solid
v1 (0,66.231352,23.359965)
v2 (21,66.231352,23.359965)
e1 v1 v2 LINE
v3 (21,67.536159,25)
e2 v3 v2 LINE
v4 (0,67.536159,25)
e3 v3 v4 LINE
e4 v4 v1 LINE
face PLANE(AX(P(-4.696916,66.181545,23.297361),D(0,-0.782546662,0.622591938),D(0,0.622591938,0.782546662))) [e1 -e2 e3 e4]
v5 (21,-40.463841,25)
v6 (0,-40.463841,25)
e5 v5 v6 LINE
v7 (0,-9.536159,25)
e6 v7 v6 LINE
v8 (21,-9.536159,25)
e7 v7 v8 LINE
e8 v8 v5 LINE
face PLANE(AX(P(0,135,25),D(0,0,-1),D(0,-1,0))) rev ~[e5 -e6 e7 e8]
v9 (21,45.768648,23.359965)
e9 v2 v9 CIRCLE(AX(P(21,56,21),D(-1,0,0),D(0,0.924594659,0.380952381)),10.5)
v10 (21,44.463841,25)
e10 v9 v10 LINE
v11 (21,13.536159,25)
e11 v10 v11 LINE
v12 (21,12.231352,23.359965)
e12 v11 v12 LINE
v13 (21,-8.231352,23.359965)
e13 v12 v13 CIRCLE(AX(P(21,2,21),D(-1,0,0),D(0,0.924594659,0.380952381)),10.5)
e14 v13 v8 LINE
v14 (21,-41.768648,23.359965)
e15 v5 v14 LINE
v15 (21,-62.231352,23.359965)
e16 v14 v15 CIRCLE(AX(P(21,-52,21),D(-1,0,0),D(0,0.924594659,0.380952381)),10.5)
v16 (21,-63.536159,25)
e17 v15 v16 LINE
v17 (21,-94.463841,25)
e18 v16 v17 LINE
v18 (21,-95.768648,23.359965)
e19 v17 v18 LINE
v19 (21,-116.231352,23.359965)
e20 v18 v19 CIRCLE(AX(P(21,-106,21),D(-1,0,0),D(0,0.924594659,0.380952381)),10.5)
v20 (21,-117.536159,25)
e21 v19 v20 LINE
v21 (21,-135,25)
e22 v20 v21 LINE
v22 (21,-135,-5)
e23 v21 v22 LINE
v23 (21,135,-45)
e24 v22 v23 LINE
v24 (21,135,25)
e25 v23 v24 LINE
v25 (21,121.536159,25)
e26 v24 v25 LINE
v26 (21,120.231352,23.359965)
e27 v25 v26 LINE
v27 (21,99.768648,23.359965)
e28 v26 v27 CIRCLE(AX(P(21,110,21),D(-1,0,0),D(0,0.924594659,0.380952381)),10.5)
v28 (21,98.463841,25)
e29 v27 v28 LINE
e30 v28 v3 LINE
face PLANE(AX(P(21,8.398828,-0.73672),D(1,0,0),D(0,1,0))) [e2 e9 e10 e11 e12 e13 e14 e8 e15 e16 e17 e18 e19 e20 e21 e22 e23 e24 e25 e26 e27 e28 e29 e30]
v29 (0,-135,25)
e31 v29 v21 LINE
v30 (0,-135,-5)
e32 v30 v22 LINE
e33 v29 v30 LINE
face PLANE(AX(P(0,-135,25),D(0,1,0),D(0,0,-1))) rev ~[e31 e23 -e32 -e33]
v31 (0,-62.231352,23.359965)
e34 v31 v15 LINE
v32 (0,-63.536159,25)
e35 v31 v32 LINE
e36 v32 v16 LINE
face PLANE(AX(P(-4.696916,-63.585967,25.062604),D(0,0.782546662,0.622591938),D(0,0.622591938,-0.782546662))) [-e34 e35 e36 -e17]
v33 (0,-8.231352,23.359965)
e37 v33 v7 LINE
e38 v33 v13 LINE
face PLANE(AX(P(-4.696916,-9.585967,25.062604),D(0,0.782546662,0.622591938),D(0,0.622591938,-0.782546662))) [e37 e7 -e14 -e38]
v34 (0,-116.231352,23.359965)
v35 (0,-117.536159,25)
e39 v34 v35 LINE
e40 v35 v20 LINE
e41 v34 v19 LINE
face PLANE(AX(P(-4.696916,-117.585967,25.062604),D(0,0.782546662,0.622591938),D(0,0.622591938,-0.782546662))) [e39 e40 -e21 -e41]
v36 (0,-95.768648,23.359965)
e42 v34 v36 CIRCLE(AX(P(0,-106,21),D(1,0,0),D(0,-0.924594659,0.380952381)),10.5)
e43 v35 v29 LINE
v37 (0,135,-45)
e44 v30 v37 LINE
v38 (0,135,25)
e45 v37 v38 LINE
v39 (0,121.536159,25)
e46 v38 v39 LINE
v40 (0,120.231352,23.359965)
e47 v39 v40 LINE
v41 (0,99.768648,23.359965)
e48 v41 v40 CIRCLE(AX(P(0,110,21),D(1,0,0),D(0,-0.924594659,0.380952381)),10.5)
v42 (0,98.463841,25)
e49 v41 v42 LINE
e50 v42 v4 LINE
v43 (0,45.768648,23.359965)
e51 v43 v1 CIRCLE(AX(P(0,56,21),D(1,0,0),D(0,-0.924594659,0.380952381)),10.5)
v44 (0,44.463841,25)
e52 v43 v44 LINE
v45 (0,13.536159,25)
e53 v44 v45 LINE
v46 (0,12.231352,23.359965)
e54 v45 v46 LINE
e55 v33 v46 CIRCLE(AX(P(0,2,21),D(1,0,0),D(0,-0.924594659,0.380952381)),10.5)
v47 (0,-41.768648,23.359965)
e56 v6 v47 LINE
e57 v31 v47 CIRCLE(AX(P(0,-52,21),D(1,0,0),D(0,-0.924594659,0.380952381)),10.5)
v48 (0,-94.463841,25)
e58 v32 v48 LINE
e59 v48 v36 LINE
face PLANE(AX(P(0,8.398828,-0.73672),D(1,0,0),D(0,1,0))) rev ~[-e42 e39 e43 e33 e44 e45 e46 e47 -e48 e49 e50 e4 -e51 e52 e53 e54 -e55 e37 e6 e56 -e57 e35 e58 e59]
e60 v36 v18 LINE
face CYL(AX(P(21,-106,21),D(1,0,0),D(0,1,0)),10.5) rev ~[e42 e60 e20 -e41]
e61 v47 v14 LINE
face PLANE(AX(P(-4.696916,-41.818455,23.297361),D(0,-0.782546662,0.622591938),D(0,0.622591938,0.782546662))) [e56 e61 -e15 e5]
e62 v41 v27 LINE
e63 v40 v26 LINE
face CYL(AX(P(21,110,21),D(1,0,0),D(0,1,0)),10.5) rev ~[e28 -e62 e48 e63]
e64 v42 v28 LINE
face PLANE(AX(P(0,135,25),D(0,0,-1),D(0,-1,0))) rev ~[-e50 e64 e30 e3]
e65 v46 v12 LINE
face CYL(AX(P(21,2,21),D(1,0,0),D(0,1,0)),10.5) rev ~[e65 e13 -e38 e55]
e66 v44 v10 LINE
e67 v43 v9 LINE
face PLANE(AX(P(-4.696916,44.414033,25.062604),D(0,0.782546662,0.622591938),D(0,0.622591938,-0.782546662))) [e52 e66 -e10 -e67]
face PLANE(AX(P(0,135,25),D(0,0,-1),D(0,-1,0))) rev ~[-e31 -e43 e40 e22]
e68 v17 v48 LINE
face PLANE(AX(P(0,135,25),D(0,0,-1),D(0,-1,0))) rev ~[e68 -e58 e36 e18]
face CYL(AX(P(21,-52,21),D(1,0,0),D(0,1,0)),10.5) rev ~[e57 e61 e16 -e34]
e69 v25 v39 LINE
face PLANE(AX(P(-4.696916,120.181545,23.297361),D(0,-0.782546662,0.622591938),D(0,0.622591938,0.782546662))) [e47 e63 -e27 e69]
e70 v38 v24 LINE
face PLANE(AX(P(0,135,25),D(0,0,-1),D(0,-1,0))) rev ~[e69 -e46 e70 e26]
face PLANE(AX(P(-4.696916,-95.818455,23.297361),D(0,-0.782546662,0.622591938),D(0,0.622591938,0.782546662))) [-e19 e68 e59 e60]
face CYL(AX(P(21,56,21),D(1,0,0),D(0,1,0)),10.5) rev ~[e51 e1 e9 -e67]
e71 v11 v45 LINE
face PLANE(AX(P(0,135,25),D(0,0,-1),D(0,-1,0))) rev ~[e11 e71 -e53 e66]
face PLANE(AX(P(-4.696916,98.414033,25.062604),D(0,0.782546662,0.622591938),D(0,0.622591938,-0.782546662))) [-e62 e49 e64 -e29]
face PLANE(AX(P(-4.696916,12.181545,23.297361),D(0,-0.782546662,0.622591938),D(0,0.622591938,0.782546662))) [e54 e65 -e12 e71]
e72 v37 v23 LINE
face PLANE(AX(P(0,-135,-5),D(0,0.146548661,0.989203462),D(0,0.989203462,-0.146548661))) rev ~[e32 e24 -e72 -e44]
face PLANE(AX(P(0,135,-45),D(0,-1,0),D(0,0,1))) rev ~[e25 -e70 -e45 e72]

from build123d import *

# Parameters (mm, degrees)
F1_DEPTH    = 21
F2_R        = 10.5
F3_DEPTH    = 25
F4_T1_DEPTH = 30.3938312155


# Not quite as in the source:
# - a fillet or chamfer that OpenCascade refuses, or shapes differently, is made with other operations: its cross-section is extruded or revolved along the edge and cut away or added


with BuildPart() as f1:
    # F0 (on Right) → F1 (new body)
    with BuildSketch(Plane.YZ):
        Polygon((-135, -5), (135, -45), (135, 25), (-135, 25), align=None)
    extrude(amount=F1_DEPTH)

    # F2 (on face) → F3 (cut)
    with BuildSketch(Plane.YZ.offset(21)):
        with Locations((110, 21)):
            Circle(F2_R)
        with Locations((56, 21)):
            Circle(F2_R)
        with Locations((2, 21)):
            Circle(F2_R)
        with Locations((-52, 21)):
            Circle(F2_R)
        with Locations((-106, 21)):
            Circle(F2_R)
    extrude(amount=-F3_DEPTH, mode=Mode.SUBTRACT)

    # F4: chamfer of 2 on 10 edges, made by hand

    # F4_s2 → F4_t1 (cut)
    with BuildSketch(Plane.YZ.offset(-4.6969156077)):
        with BuildLine():
            Line((-117.5859668407, 25.062603733), (-116.1815447498, 23.2973611197))
            Line((-116.1815447498, 23.2973611197), (-116.1425681704, 23.2883707774))
            ThreePointArc((-116.1425681704, 23.2883707774), (-115.9721143456, 24.157298763), (-115.6712601331, 24.9847619048))
            Line((-115.6712601331, 24.9847619048), (-115.7082439195, 25.04))
            ThreePointArc((-115.7082439195, 25.04), (-116.6471053801, 25.04), (-117.5859668407, 25.102603733))
            Line((-117.5859668407, 25.102603733), (-117.5859668407, 25.062603733))
        make_face()
        with BuildLine():
            Line((-95.8184552502, 23.2973611197), (-94.4140331593, 25.062603733))
            Line((-94.4140331593, 25.062603733), (-94.4140331593, 25.102603733))
            ThreePointArc((-94.4140331593, 25.102603733), (-95.3528946199, 25.04), (-96.2917560805, 25.04))
            Line((-96.2917560805, 25.04), (-96.3287398669, 24.9847619048))
            ThreePointArc((-96.3287398669, 24.9847619048), (-96.0278856544, 24.157298763), (-95.8574318296, 23.2883707774))
            Line((-95.8574318296, 23.2883707774), (-95.8184552502, 23.2973611197))
        make_face()
        with BuildLine():
            Line((-63.5859668407, 25.062603733), (-62.1815447498, 23.2973611197))
            Line((-62.1815447498, 23.2973611197), (-62.1425681704, 23.2883707774))
            ThreePointArc((-62.1425681704, 23.2883707774), (-61.9721143456, 24.157298763), (-61.6712601331, 24.9847619048))
            Line((-61.6712601331, 24.9847619048), (-61.7082439195, 25.04))
            ThreePointArc((-61.7082439195, 25.04), (-62.6471053801, 25.04), (-63.5859668407, 25.102603733))
            Line((-63.5859668407, 25.102603733), (-63.5859668407, 25.062603733))
        make_face()
        with BuildLine():
            Line((-41.8184552502, 23.2973611197), (-40.4140331593, 25.062603733))
            Line((-40.4140331593, 25.062603733), (-40.4140331593, 25.102603733))
            ThreePointArc((-40.4140331593, 25.102603733), (-41.3528946199, 25.04), (-42.2917560805, 25.04))
            Line((-42.2917560805, 25.04), (-42.3287398669, 24.9847619048))
            ThreePointArc((-42.3287398669, 24.9847619048), (-42.0278856544, 24.157298763), (-41.8574318296, 23.2883707774))
            Line((-41.8574318296, 23.2883707774), (-41.8184552502, 23.2973611197))
        make_face()
        with BuildLine():
            Line((-9.5859668407, 25.062603733), (-8.1815447498, 23.2973611197))
            Line((-8.1815447498, 23.2973611197), (-8.1425681704, 23.2883707774))
            ThreePointArc((-8.1425681704, 23.2883707774), (-7.9721143456, 24.157298763), (-7.6712601331, 24.9847619048))
            Line((-7.6712601331, 24.9847619048), (-7.7082439195, 25.04))
            ThreePointArc((-7.7082439195, 25.04), (-8.6471053801, 25.04), (-9.5859668407, 25.102603733))
            Line((-9.5859668407, 25.102603733), (-9.5859668407, 25.062603733))
        make_face()
        with BuildLine():
            Line((12.1815447498, 23.2973611197), (13.5859668407, 25.062603733))
            Line((13.5859668407, 25.062603733), (13.5859668407, 25.102603733))
            ThreePointArc((13.5859668407, 25.102603733), (12.6471053801, 25.04), (11.7082439195, 25.04))
            Line((11.7082439195, 25.04), (11.6712601331, 24.9847619048))
            ThreePointArc((11.6712601331, 24.9847619048), (11.9721143456, 24.157298763), (12.1425681704, 23.2883707774))
            Line((12.1425681704, 23.2883707774), (12.1815447498, 23.2973611197))
        make_face()
        with BuildLine():
            Line((44.4140331593, 25.062603733), (45.8184552502, 23.2973611197))
            Line((45.8184552502, 23.2973611197), (45.8574318296, 23.2883707774))
            ThreePointArc((45.8574318296, 23.2883707774), (46.0278856544, 24.157298763), (46.3287398669, 24.9847619048))
            Line((46.3287398669, 24.9847619048), (46.2917560805, 25.04))
            ThreePointArc((46.2917560805, 25.04), (45.3528946199, 25.04), (44.4140331593, 25.102603733))
            Line((44.4140331593, 25.102603733), (44.4140331593, 25.062603733))
        make_face()
        with BuildLine():
            Line((66.1815447498, 23.2973611197), (67.5859668407, 25.062603733))
            Line((67.5859668407, 25.062603733), (67.5859668407, 25.102603733))
            ThreePointArc((67.5859668407, 25.102603733), (66.6471053801, 25.04), (65.7082439195, 25.04))
            Line((65.7082439195, 25.04), (65.6712601331, 24.9847619048))
            ThreePointArc((65.6712601331, 24.9847619048), (65.9721143456, 24.157298763), (66.1425681704, 23.2883707774))
            Line((66.1425681704, 23.2883707774), (66.1815447498, 23.2973611197))
        make_face()
        with BuildLine():
            Line((98.4140331593, 25.062603733), (99.8184552502, 23.2973611197))
            Line((99.8184552502, 23.2973611197), (99.8574318296, 23.2883707774))
            ThreePointArc((99.8574318296, 23.2883707774), (100.0278856544, 24.157298763), (100.3287398669, 24.9847619048))
            Line((100.3287398669, 24.9847619048), (100.2917560805, 25.04))
            ThreePointArc((100.2917560805, 25.04), (99.3528946199, 25.04), (98.4140331593, 25.102603733))
            Line((98.4140331593, 25.102603733), (98.4140331593, 25.062603733))
        make_face()
        with BuildLine():
            Line((120.1815447498, 23.2973611197), (121.5859668407, 25.062603733))
            Line((121.5859668407, 25.062603733), (121.5859668407, 25.102603733))
            ThreePointArc((121.5859668407, 25.102603733), (120.6471053801, 25.04), (119.7082439195, 25.04))
            Line((119.7082439195, 25.04), (119.6712601331, 24.9847619048))
            ThreePointArc((119.6712601331, 24.9847619048), (119.9721143456, 24.157298763), (120.1425681704, 23.2883707774))
            Line((120.1425681704, 23.2883707774), (120.1815447498, 23.2973611197))
        make_face()
    extrude(amount=F4_T1_DEPTH, mode=Mode.SUBTRACT)


solid = f1.part
